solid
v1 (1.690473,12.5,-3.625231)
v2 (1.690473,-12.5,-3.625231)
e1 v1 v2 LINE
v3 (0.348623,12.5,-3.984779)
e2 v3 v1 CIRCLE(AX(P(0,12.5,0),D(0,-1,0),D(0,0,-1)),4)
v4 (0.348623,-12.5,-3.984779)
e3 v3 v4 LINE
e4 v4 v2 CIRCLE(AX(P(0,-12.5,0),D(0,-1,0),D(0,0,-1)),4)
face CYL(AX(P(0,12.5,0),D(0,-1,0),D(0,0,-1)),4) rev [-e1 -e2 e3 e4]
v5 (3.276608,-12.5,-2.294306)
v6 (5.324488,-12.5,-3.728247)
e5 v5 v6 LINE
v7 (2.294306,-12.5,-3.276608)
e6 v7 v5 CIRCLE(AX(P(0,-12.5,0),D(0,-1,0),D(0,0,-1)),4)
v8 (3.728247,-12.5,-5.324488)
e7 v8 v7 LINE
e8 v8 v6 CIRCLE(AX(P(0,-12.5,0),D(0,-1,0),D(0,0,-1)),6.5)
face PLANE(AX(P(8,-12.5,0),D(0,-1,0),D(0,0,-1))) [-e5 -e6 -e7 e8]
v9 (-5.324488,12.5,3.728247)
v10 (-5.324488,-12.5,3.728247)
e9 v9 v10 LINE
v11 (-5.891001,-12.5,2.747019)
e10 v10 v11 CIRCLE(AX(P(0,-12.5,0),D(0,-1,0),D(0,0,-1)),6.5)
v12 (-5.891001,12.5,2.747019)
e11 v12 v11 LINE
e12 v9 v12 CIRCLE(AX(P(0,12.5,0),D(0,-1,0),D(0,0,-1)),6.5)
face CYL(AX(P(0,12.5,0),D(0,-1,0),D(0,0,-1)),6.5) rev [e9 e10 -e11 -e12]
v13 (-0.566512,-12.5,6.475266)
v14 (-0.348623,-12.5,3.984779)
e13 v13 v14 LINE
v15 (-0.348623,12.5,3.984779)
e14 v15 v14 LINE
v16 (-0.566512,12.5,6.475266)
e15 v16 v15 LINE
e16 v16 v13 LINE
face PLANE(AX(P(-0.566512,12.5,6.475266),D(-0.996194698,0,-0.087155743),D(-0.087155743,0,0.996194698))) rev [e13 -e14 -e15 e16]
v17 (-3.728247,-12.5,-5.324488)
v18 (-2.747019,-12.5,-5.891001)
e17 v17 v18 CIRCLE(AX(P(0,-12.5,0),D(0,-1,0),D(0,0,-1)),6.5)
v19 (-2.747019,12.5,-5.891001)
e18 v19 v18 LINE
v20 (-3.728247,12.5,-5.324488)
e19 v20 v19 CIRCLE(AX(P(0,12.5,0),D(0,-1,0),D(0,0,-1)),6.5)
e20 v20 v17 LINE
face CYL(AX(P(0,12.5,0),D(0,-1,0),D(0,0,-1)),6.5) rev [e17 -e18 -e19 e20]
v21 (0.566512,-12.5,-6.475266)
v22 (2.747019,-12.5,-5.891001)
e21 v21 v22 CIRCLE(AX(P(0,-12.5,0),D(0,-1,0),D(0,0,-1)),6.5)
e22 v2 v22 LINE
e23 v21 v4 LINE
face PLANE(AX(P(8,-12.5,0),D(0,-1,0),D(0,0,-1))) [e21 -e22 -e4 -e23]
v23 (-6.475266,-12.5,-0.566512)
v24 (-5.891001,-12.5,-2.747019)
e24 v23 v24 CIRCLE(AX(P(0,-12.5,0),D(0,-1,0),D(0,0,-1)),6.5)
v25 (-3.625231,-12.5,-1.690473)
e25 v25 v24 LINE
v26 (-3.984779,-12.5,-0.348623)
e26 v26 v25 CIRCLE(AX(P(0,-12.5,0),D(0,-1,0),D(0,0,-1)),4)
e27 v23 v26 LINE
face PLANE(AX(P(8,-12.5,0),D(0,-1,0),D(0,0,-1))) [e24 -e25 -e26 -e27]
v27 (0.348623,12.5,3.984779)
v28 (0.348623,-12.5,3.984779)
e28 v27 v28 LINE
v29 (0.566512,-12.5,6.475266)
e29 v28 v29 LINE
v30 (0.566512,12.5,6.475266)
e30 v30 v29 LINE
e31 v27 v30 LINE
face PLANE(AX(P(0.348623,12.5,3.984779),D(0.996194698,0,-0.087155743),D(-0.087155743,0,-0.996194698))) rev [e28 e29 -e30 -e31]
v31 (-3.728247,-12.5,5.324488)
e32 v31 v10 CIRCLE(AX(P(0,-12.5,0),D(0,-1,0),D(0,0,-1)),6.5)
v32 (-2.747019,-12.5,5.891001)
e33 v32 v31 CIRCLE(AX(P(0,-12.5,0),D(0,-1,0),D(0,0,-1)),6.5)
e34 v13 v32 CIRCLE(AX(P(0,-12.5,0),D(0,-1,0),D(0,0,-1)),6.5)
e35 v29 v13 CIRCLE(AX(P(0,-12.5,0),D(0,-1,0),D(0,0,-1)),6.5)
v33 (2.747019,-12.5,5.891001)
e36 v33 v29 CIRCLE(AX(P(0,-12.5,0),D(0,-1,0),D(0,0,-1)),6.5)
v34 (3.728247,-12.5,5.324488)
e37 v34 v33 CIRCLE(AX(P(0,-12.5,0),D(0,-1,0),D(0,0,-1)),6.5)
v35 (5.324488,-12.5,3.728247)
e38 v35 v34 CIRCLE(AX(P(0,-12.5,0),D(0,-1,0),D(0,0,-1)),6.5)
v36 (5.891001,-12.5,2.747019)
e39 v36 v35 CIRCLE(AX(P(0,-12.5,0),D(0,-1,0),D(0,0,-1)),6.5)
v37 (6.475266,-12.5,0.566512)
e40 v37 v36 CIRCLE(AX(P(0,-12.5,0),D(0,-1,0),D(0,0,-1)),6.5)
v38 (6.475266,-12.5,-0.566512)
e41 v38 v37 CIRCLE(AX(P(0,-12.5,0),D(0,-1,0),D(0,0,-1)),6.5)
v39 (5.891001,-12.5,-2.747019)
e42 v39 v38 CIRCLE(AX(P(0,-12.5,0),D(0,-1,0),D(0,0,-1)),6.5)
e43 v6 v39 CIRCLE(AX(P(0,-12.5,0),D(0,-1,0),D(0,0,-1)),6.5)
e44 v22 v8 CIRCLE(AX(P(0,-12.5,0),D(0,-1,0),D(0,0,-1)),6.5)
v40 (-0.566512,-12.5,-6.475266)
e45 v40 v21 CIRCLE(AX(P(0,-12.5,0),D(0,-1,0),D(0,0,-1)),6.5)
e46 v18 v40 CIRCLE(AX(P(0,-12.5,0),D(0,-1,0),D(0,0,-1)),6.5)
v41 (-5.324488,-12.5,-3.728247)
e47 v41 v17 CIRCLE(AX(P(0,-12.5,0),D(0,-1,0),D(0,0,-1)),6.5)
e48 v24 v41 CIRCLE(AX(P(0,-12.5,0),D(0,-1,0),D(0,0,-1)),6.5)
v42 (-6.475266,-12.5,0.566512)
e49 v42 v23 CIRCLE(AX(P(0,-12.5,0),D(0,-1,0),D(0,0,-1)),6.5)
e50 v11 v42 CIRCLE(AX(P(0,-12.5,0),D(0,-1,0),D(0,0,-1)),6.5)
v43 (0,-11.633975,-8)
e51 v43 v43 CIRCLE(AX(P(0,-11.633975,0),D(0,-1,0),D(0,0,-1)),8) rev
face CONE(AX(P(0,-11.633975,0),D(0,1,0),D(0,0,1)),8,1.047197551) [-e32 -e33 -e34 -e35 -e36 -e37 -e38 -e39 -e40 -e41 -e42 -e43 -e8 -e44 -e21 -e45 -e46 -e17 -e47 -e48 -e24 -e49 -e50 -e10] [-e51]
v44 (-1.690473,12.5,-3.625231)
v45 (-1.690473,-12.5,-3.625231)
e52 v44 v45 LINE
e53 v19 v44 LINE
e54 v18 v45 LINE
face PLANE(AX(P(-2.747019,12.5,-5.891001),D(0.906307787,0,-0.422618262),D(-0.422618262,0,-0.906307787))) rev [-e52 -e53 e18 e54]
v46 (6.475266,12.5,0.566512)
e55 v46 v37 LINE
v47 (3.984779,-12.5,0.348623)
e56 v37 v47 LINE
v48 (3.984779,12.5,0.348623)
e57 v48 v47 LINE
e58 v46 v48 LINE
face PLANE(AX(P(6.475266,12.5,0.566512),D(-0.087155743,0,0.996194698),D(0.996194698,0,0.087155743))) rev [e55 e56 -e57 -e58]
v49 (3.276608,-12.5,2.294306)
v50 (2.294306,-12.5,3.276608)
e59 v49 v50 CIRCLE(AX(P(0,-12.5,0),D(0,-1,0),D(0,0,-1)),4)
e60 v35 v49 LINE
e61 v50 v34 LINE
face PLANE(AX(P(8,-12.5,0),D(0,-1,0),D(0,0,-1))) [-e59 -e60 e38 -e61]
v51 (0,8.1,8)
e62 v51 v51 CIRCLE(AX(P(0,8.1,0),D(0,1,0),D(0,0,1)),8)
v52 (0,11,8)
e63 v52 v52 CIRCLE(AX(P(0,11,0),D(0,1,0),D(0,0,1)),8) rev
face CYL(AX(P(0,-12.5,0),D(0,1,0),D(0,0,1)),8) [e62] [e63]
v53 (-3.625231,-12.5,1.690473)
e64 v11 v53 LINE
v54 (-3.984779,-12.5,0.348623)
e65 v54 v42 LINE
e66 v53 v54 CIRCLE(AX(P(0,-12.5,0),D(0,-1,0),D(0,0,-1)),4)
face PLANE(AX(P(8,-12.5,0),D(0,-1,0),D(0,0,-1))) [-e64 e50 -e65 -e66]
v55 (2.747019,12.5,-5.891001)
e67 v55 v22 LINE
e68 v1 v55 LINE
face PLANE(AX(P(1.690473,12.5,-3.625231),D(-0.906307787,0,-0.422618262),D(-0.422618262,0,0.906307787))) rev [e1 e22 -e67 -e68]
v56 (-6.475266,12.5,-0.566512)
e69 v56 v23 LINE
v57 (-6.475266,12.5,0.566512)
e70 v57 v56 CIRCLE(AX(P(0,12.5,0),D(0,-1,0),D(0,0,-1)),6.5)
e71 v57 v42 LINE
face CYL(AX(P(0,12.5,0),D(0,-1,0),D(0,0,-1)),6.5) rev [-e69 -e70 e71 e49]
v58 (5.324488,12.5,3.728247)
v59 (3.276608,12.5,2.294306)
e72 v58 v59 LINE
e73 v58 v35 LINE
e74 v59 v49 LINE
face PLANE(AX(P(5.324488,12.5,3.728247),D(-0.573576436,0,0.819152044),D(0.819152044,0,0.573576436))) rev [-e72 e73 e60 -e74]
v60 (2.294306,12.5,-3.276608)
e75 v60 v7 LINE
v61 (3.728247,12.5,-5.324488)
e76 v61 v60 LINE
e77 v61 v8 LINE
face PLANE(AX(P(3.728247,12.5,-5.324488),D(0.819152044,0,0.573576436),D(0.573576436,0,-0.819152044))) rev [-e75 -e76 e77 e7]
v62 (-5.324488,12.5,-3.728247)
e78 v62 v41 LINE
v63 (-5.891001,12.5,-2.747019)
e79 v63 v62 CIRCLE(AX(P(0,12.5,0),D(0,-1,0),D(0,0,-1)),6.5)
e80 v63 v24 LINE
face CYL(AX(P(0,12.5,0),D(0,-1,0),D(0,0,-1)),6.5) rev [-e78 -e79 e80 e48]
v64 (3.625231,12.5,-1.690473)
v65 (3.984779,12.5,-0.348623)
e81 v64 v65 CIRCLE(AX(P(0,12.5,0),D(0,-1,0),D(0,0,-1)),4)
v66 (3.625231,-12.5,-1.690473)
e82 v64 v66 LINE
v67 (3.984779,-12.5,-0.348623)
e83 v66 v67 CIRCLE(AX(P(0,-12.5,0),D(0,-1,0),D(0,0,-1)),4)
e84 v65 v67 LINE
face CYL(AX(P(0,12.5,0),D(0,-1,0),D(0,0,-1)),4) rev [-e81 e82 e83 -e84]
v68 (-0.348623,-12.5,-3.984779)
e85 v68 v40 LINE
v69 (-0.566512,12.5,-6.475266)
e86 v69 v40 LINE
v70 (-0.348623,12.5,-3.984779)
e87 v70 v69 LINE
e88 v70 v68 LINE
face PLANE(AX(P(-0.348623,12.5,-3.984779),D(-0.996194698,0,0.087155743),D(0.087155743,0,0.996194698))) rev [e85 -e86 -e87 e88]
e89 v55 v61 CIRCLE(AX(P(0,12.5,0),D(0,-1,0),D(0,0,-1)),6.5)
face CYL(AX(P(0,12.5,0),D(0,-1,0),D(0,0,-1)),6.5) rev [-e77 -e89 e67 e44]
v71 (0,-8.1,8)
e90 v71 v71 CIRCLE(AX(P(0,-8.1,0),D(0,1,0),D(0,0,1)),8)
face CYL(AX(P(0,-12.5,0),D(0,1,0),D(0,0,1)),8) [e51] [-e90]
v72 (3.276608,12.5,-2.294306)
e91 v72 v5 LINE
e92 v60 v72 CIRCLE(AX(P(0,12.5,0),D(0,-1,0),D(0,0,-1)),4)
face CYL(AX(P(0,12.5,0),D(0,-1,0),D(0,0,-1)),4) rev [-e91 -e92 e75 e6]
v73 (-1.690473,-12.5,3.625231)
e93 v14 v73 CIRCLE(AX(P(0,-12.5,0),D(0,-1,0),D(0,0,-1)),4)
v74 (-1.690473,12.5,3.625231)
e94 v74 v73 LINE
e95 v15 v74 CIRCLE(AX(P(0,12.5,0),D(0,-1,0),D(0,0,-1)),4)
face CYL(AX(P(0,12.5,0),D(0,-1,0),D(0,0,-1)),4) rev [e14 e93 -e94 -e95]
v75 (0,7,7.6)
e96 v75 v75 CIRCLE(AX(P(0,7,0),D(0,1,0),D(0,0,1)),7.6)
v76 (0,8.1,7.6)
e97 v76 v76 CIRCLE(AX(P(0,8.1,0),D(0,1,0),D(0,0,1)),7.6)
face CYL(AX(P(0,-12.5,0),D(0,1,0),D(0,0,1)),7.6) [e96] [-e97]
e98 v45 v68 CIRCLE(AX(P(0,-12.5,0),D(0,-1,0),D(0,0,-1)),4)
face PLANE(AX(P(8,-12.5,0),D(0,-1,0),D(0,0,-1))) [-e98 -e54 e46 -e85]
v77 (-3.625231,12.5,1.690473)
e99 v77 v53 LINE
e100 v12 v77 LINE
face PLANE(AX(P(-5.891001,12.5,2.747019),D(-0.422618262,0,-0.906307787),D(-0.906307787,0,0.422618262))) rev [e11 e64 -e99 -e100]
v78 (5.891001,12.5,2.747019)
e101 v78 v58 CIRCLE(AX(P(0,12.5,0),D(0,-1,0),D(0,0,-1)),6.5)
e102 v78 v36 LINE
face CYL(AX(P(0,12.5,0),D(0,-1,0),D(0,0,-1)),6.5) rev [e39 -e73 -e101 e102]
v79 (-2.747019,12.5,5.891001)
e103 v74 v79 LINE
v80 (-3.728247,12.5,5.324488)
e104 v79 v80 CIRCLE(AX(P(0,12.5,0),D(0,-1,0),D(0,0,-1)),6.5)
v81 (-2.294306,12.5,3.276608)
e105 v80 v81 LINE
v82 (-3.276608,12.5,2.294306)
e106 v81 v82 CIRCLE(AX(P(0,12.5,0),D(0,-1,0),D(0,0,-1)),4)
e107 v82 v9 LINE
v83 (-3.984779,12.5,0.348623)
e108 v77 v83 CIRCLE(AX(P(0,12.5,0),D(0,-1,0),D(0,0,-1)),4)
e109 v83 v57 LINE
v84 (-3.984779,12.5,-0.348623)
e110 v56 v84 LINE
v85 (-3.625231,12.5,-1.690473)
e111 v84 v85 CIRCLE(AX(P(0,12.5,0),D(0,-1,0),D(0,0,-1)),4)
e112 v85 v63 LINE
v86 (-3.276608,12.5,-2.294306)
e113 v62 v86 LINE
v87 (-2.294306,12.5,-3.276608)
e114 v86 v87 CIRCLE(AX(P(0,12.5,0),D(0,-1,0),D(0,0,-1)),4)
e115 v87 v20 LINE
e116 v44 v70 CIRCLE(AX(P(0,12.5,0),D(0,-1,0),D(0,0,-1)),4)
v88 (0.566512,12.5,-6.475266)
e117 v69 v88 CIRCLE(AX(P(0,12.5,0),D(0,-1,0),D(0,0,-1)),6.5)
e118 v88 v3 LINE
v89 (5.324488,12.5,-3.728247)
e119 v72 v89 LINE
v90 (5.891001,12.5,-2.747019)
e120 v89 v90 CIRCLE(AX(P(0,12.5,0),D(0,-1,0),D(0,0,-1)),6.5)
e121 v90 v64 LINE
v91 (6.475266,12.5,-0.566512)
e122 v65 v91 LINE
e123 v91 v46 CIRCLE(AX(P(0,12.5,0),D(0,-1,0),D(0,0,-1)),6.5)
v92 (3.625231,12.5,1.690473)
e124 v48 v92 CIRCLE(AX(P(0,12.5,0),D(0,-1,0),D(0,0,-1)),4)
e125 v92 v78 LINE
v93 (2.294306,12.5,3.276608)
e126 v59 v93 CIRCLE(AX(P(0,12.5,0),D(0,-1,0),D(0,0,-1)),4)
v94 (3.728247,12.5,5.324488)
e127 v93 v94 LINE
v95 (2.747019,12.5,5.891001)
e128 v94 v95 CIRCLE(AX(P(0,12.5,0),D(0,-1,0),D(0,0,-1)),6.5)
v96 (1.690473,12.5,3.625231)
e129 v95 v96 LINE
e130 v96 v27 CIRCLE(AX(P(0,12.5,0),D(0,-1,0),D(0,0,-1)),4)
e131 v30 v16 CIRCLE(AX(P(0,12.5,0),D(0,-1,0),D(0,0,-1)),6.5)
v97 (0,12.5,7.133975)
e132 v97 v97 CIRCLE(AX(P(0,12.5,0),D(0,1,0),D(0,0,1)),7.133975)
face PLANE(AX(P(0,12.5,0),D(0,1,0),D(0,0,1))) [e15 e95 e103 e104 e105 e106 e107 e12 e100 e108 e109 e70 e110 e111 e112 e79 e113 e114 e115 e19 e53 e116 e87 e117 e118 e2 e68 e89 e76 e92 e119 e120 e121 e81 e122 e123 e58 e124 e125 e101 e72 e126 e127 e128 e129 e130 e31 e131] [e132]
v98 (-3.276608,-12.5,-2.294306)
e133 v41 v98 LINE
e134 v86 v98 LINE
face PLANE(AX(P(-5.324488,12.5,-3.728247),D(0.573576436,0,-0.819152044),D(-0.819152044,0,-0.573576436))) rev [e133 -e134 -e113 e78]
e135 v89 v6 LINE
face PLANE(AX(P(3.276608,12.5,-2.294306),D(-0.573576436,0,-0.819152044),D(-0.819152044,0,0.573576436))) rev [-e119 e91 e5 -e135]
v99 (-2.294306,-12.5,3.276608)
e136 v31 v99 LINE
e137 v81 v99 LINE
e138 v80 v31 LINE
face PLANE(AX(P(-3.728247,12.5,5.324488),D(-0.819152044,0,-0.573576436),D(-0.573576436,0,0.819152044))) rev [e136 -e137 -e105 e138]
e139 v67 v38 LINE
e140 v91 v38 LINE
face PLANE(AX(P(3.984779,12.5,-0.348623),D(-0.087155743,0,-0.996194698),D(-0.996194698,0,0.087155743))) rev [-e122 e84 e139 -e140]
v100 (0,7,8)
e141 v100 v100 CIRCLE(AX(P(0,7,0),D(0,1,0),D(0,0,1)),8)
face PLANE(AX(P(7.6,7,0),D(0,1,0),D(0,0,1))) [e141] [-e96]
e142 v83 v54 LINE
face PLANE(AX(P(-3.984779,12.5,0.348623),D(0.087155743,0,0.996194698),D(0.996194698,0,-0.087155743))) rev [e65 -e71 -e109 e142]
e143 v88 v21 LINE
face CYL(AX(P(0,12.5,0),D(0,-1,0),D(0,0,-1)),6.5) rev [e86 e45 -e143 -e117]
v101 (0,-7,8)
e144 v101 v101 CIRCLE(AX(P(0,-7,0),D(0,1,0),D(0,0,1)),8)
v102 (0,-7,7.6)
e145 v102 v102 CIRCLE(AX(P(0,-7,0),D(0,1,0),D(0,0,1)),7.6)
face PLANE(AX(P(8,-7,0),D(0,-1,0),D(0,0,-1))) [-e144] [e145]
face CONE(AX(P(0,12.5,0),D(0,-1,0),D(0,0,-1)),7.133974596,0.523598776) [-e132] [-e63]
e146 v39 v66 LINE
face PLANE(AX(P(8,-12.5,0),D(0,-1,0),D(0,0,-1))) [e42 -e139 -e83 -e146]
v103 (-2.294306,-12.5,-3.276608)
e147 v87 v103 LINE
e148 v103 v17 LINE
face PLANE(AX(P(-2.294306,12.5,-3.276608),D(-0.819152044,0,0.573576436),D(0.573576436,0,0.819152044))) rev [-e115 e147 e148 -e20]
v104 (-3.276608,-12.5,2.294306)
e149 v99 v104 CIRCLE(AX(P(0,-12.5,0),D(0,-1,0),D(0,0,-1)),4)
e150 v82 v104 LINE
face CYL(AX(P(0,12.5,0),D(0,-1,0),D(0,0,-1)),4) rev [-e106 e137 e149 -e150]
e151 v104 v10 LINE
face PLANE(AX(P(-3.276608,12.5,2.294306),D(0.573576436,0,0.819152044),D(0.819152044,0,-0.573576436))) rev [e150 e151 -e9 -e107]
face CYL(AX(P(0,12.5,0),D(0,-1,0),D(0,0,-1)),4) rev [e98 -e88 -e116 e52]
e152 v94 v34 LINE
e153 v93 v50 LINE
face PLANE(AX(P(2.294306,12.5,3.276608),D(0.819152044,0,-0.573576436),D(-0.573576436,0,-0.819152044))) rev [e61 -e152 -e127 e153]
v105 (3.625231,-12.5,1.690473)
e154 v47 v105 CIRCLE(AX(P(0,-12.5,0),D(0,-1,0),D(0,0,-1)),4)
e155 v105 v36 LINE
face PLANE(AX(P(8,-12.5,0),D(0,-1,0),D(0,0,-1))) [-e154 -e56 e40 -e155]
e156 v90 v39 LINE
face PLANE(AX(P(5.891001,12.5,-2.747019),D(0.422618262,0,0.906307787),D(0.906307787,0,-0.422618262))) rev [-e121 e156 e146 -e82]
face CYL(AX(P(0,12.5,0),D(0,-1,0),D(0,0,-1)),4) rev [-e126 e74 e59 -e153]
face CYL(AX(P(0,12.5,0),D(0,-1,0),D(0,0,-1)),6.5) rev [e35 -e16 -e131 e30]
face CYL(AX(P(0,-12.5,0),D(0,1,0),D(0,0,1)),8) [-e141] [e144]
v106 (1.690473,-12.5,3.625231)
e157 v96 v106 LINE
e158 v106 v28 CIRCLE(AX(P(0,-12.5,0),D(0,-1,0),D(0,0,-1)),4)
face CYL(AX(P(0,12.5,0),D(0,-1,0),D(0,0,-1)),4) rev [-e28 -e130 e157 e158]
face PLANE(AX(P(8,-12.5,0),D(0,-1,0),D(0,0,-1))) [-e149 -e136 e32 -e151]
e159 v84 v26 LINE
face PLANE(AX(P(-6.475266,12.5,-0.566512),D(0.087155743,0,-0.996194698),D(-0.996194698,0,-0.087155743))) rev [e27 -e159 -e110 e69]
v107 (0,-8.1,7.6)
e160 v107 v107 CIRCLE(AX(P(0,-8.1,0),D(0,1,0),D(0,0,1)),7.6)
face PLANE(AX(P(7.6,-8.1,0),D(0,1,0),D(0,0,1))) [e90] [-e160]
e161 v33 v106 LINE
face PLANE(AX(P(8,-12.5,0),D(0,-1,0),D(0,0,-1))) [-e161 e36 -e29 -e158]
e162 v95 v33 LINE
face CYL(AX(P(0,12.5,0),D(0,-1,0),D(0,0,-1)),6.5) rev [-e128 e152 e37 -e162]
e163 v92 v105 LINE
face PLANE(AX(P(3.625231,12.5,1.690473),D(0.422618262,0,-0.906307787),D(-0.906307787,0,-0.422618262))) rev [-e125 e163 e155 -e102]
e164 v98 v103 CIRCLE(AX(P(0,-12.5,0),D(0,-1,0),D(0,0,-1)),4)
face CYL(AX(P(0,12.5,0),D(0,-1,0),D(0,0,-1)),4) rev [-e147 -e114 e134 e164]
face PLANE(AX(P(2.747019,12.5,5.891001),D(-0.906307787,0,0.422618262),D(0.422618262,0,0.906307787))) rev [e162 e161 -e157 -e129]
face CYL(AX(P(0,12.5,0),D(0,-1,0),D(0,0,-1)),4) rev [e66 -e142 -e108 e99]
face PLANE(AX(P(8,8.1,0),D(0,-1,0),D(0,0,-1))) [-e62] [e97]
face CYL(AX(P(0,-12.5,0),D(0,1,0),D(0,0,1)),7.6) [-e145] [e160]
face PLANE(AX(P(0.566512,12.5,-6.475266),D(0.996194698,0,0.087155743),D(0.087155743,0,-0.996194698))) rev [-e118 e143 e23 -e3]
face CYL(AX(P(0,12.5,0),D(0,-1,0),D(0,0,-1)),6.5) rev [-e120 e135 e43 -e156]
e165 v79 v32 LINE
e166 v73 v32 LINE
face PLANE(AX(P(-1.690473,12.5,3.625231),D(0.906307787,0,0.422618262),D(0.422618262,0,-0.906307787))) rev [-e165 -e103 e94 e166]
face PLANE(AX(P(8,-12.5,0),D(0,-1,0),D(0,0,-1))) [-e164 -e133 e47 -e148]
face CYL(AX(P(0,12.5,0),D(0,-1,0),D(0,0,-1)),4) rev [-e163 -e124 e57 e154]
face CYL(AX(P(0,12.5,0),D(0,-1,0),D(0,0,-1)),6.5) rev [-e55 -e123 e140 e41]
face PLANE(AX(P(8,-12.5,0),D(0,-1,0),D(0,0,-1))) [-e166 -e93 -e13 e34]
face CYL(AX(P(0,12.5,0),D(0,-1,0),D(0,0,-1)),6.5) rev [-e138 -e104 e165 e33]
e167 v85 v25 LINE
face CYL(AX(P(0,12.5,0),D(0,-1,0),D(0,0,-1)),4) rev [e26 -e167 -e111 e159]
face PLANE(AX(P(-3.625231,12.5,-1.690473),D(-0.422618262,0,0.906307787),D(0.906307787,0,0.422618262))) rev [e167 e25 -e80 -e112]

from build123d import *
from OCP.BRepFilletAPI import BRepFilletAPI_MakeChamfer

# Parameters (mm, degrees)
CUT_EXTRUDE1_DEPTH = 28.440845468
CHAMFER1_SIZE      = 0.866025404
CHAMFER1_SIZE_2    = 1.5


with BuildPart() as part:
    # Sketch1 → Revolve1 (revolve)
    with BuildSketch(Plane(origin=(0, 0, 0), x_dir=(-1, 0, 0), z_dir=(0, 0, -1)), mode=Mode.PRIVATE) as revolve1_sk:
        Polygon((-8, -12.5), (0, -12.5), (0, 12.5), (-8, 12.5), (-8, 8.1), (-7.6, 8.1), (-7.6, 7), (-8, 7), (-8, -7), (-7.6, -7), (-7.6, -8.1), (-8, -8.1), align=None)
    revolve(revolve1_sk.sketch.rotate(Axis((0, -12.5, 0), (0, 1, 0)), 270), axis=Axis((0, -12.5, 0), (0, 1, 0)))

    # Sketch2 → Cut-Extrude1 (cut, through all)
    with BuildSketch(Plane.XZ.offset(12.5)):
        with BuildLine():
            Line((-1.690473047, 3.625231148), (-2.747018701, 5.891000616))
            ThreePointArc((-2.747018701, 5.891000616), (-3.25, 5.629165125), (-3.728246836, 5.324488288))
            Line((-3.728246836, 5.324488288), (-2.294305745, 3.276608177))
            ThreePointArc((-2.294305745, 3.276608177), (-2.828427125, 2.828427125), (-3.276608177, 2.294305745))
            Line((-3.276608177, 2.294305745), (-5.324488288, 3.728246836))
            ThreePointArc((-5.324488288, 3.728246836), (-5.629165125, 3.25), (-5.891000616, 2.747018701))
            Line((-5.891000616, 2.747018701), (-3.625231148, 1.690473047))
            ThreePointArc((-3.625231148, 1.690473047), (-3.863703305, 1.03527618), (-3.984778792, 0.348622971))
            Line((-3.984778792, 0.348622971), (-6.475265538, 0.566512328))
            ThreePointArc((-6.475265538, 0.566512328), (-6.5, 0), (-6.475265538, -0.566512328))
            Line((-6.475265538, -0.566512328), (-3.984778792, -0.348622971))
            ThreePointArc((-3.984778792, -0.348622971), (-3.863703305, -1.03527618), (-3.625231148, -1.690473047))
            Line((-3.625231148, -1.690473047), (-5.891000616, -2.747018701))
            ThreePointArc((-5.891000616, -2.747018701), (-5.629165125, -3.25), (-5.324488288, -3.728246836))
            Line((-5.324488288, -3.728246836), (-3.276608177, -2.294305745))
            ThreePointArc((-3.276608177, -2.294305745), (-2.828427125, -2.828427125), (-2.294305745, -3.276608177))
            Line((-2.294305745, -3.276608177), (-3.728246836, -5.324488288))
            ThreePointArc((-3.728246836, -5.324488288), (-3.25, -5.629165125), (-2.747018701, -5.891000616))
            Line((-2.747018701, -5.891000616), (-1.690473047, -3.625231148))
            ThreePointArc((-1.690473047, -3.625231148), (-1.03527618, -3.863703305), (-0.348622971, -3.984778792))
            Line((-0.348622971, -3.984778792), (-0.566512328, -6.475265538))
            ThreePointArc((-0.566512328, -6.475265538), (0, -6.5), (0.566512328, -6.475265538))
            Line((0.566512328, -6.475265538), (0.348622971, -3.984778792))
            ThreePointArc((0.348622971, -3.984778792), (1.03527618, -3.863703305), (1.690473047, -3.625231148))
            Line((1.690473047, -3.625231148), (2.747018701, -5.891000616))
            ThreePointArc((2.747018701, -5.891000616), (3.25, -5.629165125), (3.728246836, -5.324488288))
            Line((3.728246836, -5.324488288), (2.294305745, -3.276608177))
            ThreePointArc((2.294305745, -3.276608177), (2.828427125, -2.828427125), (3.276608177, -2.294305745))
            Line((3.276608177, -2.294305745), (5.324488288, -3.728246836))
            ThreePointArc((5.324488288, -3.728246836), (5.629165125, -3.25), (5.891000616, -2.747018701))
            Line((5.891000616, -2.747018701), (3.625231148, -1.690473047))
            ThreePointArc((3.625231148, -1.690473047), (3.863703305, -1.03527618), (3.984778792, -0.348622971))
            Line((3.984778792, -0.348622971), (6.475265538, -0.566512328))
            ThreePointArc((6.475265538, -0.566512328), (6.5, 0), (6.475265538, 0.566512328))
            Line((6.475265538, 0.566512328), (3.984778792, 0.348622971))
            ThreePointArc((3.984778792, 0.348622971), (3.863703305, 1.03527618), (3.625231148, 1.690473047))
            Line((3.625231148, 1.690473047), (5.891000616, 2.747018701))
            ThreePointArc((5.891000616, 2.747018701), (5.629165125, 3.25), (5.324488288, 3.728246836))
            Line((5.324488288, 3.728246836), (3.276608177, 2.294305745))
            ThreePointArc((3.276608177, 2.294305745), (2.828427125, 2.828427125), (2.294305745, 3.276608177))
            Line((2.294305745, 3.276608177), (3.728246836, 5.324488288))
            ThreePointArc((3.728246836, 5.324488288), (3.25, 5.629165125), (2.747018701, 5.891000616))
            Line((2.747018701, 5.891000616), (1.690473047, 3.625231148))
            ThreePointArc((1.690473047, 3.625231148), (1.03527618, 3.863703305), (0.348622971, 3.984778792))
            Line((0.348622971, 3.984778792), (0.566512328, 6.475265538))
            ThreePointArc((0.566512328, 6.475265538), (0, 6.5), (-0.566512328, 6.475265538))
            Line((-0.566512328, 6.475265538), (-0.348622971, 3.984778792))
            ThreePointArc((-0.348622971, 3.984778792), (-1.03527618, 3.863703305), (-1.690473047, 3.625231148))
        make_face()
    extrude(amount=-CUT_EXTRUDE1_DEPTH, mode=Mode.SUBTRACT)

    # Chamfer1
    chamfer1_edges_1 = [part.edges().sort_by_distance(p)[0] for p in [
        (0, 12.5, -8),
    ]]
    chamfer1_side_1 = [part.faces().sort_by_distance(p)[0] for p in [
        (0, 12.5, -7.982679492),
    ]]
    chamfer1_edges_2 = [part.edges().sort_by_distance(p)[0] for p in [
        (0, -12.5, -8),
    ]]
    chamfer1_side_2 = [part.faces().sort_by_distance(p)[0] for p in [
        (0, -12.5, -7.982679492),
    ]]
    chamfer1 = BRepFilletAPI_MakeChamfer(part.part.solid().wrapped)
    for e in chamfer1_edges_1:
        chamfer1.Add(CHAMFER1_SIZE - 0.0001, CHAMFER1_SIZE_2 - 0.0001, e.wrapped, chamfer1_side_1[0].wrapped)
    for e in chamfer1_edges_2:
        chamfer1.Add(CHAMFER1_SIZE_2 - 0.0001, CHAMFER1_SIZE - 0.0001, e.wrapped, chamfer1_side_2[0].wrapped)
    add(Compound.cast(chamfer1.Shape()), mode=Mode.REPLACE)  # a hair under: the kernel refuses the full size


solid = part.part
